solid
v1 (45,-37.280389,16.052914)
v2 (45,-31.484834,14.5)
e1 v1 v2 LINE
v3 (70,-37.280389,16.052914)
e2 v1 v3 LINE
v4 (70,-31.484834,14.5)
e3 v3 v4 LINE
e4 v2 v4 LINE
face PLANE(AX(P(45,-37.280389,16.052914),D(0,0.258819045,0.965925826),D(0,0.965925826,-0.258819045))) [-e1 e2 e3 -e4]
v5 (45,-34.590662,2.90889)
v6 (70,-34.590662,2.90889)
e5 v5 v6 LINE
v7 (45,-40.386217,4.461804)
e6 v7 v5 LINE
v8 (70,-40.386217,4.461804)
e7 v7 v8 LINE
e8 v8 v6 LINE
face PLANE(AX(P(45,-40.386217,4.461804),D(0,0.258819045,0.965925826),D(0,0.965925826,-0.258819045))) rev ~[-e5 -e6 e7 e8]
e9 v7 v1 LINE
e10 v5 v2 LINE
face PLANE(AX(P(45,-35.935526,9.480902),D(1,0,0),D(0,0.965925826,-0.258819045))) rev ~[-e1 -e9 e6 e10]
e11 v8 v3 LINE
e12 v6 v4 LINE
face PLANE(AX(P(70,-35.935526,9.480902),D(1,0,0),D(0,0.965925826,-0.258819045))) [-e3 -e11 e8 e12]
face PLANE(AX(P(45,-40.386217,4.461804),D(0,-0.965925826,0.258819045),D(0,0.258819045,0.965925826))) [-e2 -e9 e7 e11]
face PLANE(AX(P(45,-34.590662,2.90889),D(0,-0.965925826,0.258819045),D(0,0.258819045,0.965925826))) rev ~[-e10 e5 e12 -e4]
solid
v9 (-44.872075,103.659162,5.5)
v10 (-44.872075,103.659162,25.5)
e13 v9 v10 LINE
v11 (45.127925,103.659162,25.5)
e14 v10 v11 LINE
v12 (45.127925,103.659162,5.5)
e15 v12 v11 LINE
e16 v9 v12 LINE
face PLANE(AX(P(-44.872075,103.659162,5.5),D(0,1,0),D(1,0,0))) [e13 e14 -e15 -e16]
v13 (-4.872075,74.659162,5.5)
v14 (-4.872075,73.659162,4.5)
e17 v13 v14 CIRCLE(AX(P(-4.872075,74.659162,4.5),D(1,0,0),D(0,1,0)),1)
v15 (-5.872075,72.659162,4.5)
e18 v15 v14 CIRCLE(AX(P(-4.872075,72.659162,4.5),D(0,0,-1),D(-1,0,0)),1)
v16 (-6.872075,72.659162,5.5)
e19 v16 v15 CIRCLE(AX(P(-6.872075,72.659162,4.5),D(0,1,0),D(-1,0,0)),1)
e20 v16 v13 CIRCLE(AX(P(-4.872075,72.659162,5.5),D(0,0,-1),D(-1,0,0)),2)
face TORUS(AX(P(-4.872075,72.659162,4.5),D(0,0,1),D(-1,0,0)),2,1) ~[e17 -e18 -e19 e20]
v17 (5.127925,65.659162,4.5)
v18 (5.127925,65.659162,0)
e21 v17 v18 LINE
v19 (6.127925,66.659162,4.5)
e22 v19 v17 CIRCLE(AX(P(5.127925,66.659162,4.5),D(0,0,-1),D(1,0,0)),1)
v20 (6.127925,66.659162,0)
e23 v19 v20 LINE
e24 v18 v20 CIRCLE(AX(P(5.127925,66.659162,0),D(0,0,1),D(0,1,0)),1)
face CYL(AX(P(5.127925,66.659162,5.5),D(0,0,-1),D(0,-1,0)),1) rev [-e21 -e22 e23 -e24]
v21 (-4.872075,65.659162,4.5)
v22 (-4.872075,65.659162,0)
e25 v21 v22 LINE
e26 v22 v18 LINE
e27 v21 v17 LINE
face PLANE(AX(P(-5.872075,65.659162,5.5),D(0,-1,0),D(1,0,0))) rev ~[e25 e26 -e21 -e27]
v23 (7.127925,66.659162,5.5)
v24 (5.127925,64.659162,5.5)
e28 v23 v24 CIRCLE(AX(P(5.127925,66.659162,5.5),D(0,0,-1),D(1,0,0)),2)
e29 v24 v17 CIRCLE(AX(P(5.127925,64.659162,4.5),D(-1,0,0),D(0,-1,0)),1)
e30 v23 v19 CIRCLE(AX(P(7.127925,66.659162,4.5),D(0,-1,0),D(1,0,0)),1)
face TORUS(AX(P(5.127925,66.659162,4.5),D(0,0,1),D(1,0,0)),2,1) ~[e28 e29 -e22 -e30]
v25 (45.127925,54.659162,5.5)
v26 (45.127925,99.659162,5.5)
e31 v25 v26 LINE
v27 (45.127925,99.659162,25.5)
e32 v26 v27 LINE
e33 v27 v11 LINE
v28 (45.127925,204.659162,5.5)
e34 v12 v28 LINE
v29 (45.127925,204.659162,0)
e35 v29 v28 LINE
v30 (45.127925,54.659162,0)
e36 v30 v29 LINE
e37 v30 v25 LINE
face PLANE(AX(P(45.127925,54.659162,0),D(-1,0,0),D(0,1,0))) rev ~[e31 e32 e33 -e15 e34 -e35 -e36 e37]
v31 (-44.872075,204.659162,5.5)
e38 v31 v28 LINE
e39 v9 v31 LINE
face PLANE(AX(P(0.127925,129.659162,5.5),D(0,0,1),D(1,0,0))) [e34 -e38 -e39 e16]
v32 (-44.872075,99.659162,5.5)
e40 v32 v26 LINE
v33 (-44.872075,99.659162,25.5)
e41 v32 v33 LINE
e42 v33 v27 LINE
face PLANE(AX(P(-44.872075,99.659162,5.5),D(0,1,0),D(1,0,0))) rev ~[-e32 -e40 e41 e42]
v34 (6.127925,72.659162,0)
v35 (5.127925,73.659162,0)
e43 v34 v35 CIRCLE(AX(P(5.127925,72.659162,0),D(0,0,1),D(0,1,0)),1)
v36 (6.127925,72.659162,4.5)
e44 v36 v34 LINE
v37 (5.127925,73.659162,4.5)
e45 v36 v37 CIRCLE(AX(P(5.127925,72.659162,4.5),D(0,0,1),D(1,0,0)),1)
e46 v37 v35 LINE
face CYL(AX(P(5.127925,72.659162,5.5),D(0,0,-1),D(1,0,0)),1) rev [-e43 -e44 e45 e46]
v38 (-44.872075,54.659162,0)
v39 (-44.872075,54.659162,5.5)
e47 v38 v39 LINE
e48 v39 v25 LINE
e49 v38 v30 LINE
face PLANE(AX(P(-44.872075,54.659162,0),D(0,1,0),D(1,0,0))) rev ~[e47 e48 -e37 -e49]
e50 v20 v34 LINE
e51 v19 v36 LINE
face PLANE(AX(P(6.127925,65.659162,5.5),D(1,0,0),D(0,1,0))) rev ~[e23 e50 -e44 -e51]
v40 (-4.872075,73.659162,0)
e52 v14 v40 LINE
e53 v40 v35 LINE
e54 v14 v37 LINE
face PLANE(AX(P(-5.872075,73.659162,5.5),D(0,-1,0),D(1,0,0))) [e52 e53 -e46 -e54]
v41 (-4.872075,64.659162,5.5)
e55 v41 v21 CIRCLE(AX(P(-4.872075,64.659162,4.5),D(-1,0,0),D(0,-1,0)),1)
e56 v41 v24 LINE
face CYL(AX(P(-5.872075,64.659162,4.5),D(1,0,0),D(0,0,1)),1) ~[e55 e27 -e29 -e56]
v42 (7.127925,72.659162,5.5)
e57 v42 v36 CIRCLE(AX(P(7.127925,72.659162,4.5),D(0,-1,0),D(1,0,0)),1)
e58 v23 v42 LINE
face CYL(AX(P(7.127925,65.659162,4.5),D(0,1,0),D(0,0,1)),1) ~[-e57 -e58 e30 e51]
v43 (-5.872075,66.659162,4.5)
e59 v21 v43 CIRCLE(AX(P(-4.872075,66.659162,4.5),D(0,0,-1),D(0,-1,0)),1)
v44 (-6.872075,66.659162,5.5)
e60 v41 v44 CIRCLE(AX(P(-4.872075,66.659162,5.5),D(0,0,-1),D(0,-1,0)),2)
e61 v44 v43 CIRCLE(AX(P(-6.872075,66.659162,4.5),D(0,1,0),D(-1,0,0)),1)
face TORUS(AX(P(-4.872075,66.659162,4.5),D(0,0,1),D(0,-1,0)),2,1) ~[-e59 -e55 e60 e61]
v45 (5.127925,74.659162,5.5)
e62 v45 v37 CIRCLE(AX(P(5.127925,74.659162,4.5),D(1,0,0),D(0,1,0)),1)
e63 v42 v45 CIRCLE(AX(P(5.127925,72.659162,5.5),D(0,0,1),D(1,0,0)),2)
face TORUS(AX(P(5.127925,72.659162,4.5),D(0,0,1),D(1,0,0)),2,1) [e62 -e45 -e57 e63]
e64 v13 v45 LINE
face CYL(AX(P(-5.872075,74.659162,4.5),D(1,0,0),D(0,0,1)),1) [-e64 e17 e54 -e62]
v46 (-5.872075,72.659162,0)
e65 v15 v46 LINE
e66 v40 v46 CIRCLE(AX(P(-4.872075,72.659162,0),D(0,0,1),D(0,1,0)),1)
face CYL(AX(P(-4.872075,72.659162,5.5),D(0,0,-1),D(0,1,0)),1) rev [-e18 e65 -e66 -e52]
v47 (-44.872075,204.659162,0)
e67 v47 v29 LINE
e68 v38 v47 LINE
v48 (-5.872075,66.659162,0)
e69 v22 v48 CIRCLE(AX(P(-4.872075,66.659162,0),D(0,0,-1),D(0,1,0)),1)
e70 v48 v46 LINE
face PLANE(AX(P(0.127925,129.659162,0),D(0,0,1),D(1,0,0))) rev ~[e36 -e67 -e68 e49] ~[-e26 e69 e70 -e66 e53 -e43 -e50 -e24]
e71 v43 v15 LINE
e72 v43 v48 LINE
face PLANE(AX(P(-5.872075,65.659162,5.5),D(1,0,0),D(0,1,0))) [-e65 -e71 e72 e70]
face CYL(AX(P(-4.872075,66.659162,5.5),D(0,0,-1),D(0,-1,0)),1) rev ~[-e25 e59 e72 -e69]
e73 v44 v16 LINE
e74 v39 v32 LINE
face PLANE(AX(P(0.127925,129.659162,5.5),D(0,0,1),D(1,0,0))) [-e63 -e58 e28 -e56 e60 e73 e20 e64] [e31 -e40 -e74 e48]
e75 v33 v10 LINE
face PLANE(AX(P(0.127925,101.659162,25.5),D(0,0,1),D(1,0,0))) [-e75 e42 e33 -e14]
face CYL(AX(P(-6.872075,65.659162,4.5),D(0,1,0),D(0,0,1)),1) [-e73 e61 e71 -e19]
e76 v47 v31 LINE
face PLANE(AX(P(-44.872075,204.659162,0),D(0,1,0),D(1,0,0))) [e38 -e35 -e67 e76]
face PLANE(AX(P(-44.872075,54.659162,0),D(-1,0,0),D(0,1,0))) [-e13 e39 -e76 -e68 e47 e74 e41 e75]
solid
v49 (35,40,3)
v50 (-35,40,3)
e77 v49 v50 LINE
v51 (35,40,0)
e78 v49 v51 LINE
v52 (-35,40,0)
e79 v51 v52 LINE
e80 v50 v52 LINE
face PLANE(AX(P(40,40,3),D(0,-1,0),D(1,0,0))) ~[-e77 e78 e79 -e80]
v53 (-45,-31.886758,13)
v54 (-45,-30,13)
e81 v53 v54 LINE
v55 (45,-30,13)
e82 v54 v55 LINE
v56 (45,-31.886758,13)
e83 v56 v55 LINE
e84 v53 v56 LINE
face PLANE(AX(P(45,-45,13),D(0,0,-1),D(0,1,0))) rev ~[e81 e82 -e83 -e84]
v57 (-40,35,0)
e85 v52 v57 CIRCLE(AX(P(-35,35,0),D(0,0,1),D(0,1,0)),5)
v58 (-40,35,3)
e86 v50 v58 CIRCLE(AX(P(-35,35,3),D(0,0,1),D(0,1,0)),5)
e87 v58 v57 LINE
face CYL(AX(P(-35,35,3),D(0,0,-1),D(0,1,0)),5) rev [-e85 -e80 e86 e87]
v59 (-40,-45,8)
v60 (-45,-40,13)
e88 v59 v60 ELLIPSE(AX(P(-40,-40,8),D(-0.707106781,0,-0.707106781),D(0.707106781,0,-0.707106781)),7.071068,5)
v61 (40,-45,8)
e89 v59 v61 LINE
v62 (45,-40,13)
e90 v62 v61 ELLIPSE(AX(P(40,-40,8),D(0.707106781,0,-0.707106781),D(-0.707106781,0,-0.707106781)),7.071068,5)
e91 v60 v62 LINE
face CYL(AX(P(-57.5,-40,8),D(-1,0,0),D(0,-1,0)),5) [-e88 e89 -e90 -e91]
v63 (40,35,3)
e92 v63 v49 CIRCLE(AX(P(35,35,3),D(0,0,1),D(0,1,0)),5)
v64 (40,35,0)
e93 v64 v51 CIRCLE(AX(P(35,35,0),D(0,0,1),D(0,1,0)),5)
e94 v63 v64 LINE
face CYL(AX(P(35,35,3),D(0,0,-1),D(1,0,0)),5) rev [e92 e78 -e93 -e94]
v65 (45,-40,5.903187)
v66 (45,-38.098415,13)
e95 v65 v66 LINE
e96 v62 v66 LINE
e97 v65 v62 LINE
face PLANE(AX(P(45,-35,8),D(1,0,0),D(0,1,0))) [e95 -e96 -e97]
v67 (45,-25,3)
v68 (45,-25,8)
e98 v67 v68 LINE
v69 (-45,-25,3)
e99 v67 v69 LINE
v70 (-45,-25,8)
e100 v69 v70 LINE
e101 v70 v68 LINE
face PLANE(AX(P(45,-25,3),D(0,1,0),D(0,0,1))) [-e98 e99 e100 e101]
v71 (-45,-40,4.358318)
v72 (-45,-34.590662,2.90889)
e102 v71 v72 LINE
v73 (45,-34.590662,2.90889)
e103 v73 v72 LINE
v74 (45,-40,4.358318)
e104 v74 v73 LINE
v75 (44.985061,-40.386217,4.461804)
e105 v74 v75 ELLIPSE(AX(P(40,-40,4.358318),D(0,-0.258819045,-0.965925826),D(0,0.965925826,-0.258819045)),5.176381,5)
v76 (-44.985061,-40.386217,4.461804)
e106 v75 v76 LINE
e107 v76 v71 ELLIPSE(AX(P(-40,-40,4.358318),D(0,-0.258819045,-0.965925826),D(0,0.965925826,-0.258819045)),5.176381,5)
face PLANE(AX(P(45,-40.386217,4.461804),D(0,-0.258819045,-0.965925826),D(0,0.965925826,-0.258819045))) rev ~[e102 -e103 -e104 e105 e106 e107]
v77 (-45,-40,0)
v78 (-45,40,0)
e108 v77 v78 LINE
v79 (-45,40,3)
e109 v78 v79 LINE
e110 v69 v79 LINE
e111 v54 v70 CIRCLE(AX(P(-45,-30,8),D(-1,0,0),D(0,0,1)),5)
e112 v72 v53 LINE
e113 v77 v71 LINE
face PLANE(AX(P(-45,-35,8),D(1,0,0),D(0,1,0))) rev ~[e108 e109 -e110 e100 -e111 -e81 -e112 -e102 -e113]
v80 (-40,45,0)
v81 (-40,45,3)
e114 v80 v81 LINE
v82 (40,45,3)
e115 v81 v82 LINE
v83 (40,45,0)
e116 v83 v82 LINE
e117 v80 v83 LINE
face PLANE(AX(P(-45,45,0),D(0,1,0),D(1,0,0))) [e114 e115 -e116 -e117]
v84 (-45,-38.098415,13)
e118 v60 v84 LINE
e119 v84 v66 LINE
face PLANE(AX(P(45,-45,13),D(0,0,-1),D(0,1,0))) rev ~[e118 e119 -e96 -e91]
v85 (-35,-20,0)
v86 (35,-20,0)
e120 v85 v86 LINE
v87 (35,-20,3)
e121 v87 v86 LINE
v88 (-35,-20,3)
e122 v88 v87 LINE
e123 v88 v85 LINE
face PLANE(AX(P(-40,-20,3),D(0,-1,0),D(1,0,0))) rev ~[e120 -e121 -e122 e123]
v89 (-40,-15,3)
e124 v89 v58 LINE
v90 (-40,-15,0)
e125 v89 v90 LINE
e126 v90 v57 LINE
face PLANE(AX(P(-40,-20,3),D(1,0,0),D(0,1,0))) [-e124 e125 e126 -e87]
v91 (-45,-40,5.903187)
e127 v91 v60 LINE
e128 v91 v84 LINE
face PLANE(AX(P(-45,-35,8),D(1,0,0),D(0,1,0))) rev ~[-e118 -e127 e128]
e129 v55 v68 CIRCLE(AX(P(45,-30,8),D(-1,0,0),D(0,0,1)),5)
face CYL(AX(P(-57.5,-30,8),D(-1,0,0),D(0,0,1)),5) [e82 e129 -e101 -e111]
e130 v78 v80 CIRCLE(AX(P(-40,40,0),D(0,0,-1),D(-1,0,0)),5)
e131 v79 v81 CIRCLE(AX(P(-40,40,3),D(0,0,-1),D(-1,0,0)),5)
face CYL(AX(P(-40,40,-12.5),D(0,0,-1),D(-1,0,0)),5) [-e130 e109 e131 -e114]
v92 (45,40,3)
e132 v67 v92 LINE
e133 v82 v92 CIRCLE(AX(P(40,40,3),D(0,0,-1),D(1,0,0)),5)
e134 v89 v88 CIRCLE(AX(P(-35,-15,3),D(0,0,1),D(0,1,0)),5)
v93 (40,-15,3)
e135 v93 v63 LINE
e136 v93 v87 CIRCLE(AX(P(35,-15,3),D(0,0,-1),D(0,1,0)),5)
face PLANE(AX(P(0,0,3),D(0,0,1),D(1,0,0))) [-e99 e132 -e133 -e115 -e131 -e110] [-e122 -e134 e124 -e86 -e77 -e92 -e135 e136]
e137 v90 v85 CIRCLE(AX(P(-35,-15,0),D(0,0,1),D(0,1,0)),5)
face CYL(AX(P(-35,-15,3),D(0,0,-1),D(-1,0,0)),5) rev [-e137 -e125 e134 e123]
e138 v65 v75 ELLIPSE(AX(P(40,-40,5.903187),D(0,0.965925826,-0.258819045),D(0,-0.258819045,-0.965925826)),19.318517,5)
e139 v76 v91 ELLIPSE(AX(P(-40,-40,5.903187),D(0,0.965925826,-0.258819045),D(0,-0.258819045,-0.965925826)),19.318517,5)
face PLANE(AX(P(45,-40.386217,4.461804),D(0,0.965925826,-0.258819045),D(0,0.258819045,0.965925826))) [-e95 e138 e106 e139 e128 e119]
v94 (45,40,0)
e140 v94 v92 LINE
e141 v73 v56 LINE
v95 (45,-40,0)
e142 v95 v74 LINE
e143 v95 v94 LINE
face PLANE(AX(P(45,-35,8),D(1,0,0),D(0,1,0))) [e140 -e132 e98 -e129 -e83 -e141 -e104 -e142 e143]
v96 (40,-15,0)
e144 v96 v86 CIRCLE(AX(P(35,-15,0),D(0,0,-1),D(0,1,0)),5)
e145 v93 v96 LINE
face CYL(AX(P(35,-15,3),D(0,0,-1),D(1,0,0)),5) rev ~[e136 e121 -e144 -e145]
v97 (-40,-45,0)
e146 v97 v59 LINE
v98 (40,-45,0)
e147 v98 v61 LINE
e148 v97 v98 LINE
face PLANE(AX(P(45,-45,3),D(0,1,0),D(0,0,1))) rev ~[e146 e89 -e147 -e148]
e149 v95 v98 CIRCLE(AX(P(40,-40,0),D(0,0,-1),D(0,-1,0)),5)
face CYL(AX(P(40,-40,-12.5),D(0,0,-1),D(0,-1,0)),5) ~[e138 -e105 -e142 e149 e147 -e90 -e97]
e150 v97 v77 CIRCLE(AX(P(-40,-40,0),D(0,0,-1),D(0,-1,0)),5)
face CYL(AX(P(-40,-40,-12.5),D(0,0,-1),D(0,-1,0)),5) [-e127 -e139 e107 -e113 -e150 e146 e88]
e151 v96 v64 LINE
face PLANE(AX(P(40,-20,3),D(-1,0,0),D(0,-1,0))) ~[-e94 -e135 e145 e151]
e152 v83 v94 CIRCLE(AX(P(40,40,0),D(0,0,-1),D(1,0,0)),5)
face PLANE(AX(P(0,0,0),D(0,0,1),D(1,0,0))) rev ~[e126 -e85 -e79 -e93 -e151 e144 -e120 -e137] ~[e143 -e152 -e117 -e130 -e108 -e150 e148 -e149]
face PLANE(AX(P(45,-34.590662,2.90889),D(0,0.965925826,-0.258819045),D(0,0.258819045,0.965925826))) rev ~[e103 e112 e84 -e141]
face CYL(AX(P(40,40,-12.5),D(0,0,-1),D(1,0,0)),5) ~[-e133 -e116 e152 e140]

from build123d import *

# Parameters (mm, degrees)
F0_W        = 90
F0_H        = 90
F1_DEPTH    = 3
F2_W        = 20
F2_H        = 10
F3_DEPTH    = 90
F4_W        = 6
F4_H        = 12
F5_DEPTH    = 25
F6_ANGLE    = 15
F8_DEPTH    = 200
F9_T1_DEPTH = 28
F9_T3_DEPTH = 38
F9_T5_DEPTH = 115
F10_W       = 40
F10_H       = 60
F11_DEPTH   = 25
F12_R       = 5
F13_W       = 90
F13_H       = 150
F14_DEPTH   = 5.5
F15_W       = 90
F15_H       = 4
F16_DEPTH   = 20
F17_W       = 12
F17_H       = 8
F18_DEPTH   = 25
F19_R       = 1


# Not quite as in the source:
# - a fillet or chamfer that OpenCascade refuses, or shapes differently, is made with other operations: its cross-section is extruded or revolved along the edge and cut away or added
# - a pattern or mirror of a feature is missing from the dataset's text; its kind, count and spacing are read off the source's solid
# - a feature names something its author has since deleted; it is built from what else it names


with BuildPart() as f1:
    # F0 (on Top) → F1 (new body)
    with BuildSketch(Plane.XY):
        Rectangle(F0_W, F0_H)
    extrude(amount=F1_DEPTH)

    # F2 (on face) → F3 (join, through all)
    with BuildSketch(Plane.YZ.offset(45)):
        with Locations((-35, 8)):
            Rectangle(F2_W, F2_H)
    extrude(amount=-F3_DEPTH)



with BuildPart() as f5:
    # F4 (on face) → F5 (new body)
    with BuildSketch(Plane.YZ.offset(45)):
        with Locations((-35.6848337948, 7)):
            Rectangle(F4_W, F4_H)
    extrude(amount=F5_DEPTH)


with BuildPart() as f5_1:
    # F6: moved
    add(f5.part.rotate(Axis((57.5, -32.6848337948, 13), (-1, 0, 0)), F6_ANGLE))


with BuildPart() as f5_2:
    # F7: moved
    add(f5_1.part.moved(Location((0, 1.2, 1.5))))


with BuildPart() as f1_1:
    add(f1.part)
    # F8 (cut): a face of the model
    f8_faces = [f5_2.part.faces().sort_by_distance(p)[0] for p in [
        (45, -35.9355255443, 9.4809021776),
    ]]
    extrude(f8_faces, amount=F8_DEPTH, mode=Mode.SUBTRACT)

    # F9: fillet of radius 5 on 6 edges, made by hand

    # F9_s2 → F9_t1 (cut)
    with BuildSketch(Plane.XY.offset(-12.5)):
        with BuildLine():
            ThreePointArc((-45, 40), (-43.5355339059, 43.5355339059), (-40, 45))
            Line((-40, 45), (-45, 45))
            Line((-45, 45), (-45, 40))
        make_face()
        with BuildLine():
            ThreePointArc((45, 40), (43.5355339059, 43.5355339059), (40, 45))
            Line((40, 45), (45, 45))
            Line((45, 45), (45, 40))
        make_face()
    extrude(amount=F9_T1_DEPTH, mode=Mode.SUBTRACT)

    # F9_s4 → F9_t3 (cut)
    with BuildSketch(Plane.XY.offset(-12.5)):
        with BuildLine():
            ThreePointArc((-40, -45), (-43.5355339059, -43.5355339059), (-45, -40))
            Line((-45, -40), (-45, -45))
            Line((-45, -45), (-40, -45))
        make_face()
        with BuildLine():
            ThreePointArc((40, -45), (43.5355339059, -43.5355339059), (45, -40))
            Line((45, -40), (45, -45))
            Line((45, -45), (40, -45))
        make_face()
    extrude(amount=F9_T3_DEPTH, mode=Mode.SUBTRACT)

    # F9_s6 → F9_t5 (cut)
    with BuildSketch(Plane.YZ.offset(-57.5)):
        with BuildLine():
            ThreePointArc((-45, 8), (-43.5355339059, 11.5355339059), (-40, 13))
            Line((-40, 13), (-45, 13))
            Line((-45, 13), (-45, 8))
        make_face()
        with BuildLine():
            ThreePointArc((-30, 13), (-26.4644660941, 11.5355339059), (-25, 8))
            Line((-25, 8), (-25, 13))
            Line((-25, 13), (-30, 13))
        make_face()
    extrude(amount=F9_T5_DEPTH, mode=Mode.SUBTRACT)

    # F10 (on face) → F11 (cut)
    with BuildSketch(Plane.XY.offset(3)):
        with Locations((-20, 10)):
            Rectangle(F10_W, F10_H)
    f11 = extrude(amount=-F11_DEPTH, mode=Mode.SUBTRACT)

    # F11_copies: F11 across plane
    add(f11.mirror(Plane(origin=(0, 0, 0), x_dir=(0, 0, 1), z_dir=(1, 0, 0))), mode=Mode.SUBTRACT)

    # F12
    f12_edges = [f1_1.edges().sort_by_distance(p)[0] for p in [
        (-40, 40, 1.5),
        (-40, -20, 1.5),
        (40, 40, 1.5),
        (40, -20, 1.5),
    ]]
    fillet(f12_edges, radius=F12_R)


with BuildPart() as f14:
    # F13 (on Top) → F14 (new body)
    with BuildSketch(Plane.XY):
        with Locations((0.1279246807, 129.6591617167)):
            Rectangle(F13_W, F13_H)
    extrude(amount=F14_DEPTH)

    # F15 (on face) → F16 (join)
    with BuildSketch(Plane.XY.offset(5.5)):
        with Locations((0.1279246807, 101.6591617167)):
            Rectangle(F15_W, F15_H)
    extrude(amount=F16_DEPTH)

    # F17 (on face) → F18 (cut)
    with BuildSketch(Plane.XY.offset(5.5)):
        with Locations((0.1279246807, 69.6591617167)):
            Rectangle(F17_W, F17_H)
    extrude(amount=-F18_DEPTH, mode=Mode.SUBTRACT)

    # F19
    f19_edges = [f14.edges().sort_by_distance(p)[0] for p in [
        (-5.872075, 73.659162, 2.75),
        (6.127925, 73.659162, 2.75),
        (0.127925, 65.659162, 5.5),
        (-5.872075, 69.659162, 5.5),
        (6.127925, 65.659162, 2.75),
        (-5.872075, 65.659162, 2.75),
        (6.127925, 69.659162, 5.5),
        (0.127925, 73.659162, 5.5),
    ]]
    fillet(f19_edges, radius=F19_R)


solid = Compound([f5_2.part, f1_1.part, f14.part])
